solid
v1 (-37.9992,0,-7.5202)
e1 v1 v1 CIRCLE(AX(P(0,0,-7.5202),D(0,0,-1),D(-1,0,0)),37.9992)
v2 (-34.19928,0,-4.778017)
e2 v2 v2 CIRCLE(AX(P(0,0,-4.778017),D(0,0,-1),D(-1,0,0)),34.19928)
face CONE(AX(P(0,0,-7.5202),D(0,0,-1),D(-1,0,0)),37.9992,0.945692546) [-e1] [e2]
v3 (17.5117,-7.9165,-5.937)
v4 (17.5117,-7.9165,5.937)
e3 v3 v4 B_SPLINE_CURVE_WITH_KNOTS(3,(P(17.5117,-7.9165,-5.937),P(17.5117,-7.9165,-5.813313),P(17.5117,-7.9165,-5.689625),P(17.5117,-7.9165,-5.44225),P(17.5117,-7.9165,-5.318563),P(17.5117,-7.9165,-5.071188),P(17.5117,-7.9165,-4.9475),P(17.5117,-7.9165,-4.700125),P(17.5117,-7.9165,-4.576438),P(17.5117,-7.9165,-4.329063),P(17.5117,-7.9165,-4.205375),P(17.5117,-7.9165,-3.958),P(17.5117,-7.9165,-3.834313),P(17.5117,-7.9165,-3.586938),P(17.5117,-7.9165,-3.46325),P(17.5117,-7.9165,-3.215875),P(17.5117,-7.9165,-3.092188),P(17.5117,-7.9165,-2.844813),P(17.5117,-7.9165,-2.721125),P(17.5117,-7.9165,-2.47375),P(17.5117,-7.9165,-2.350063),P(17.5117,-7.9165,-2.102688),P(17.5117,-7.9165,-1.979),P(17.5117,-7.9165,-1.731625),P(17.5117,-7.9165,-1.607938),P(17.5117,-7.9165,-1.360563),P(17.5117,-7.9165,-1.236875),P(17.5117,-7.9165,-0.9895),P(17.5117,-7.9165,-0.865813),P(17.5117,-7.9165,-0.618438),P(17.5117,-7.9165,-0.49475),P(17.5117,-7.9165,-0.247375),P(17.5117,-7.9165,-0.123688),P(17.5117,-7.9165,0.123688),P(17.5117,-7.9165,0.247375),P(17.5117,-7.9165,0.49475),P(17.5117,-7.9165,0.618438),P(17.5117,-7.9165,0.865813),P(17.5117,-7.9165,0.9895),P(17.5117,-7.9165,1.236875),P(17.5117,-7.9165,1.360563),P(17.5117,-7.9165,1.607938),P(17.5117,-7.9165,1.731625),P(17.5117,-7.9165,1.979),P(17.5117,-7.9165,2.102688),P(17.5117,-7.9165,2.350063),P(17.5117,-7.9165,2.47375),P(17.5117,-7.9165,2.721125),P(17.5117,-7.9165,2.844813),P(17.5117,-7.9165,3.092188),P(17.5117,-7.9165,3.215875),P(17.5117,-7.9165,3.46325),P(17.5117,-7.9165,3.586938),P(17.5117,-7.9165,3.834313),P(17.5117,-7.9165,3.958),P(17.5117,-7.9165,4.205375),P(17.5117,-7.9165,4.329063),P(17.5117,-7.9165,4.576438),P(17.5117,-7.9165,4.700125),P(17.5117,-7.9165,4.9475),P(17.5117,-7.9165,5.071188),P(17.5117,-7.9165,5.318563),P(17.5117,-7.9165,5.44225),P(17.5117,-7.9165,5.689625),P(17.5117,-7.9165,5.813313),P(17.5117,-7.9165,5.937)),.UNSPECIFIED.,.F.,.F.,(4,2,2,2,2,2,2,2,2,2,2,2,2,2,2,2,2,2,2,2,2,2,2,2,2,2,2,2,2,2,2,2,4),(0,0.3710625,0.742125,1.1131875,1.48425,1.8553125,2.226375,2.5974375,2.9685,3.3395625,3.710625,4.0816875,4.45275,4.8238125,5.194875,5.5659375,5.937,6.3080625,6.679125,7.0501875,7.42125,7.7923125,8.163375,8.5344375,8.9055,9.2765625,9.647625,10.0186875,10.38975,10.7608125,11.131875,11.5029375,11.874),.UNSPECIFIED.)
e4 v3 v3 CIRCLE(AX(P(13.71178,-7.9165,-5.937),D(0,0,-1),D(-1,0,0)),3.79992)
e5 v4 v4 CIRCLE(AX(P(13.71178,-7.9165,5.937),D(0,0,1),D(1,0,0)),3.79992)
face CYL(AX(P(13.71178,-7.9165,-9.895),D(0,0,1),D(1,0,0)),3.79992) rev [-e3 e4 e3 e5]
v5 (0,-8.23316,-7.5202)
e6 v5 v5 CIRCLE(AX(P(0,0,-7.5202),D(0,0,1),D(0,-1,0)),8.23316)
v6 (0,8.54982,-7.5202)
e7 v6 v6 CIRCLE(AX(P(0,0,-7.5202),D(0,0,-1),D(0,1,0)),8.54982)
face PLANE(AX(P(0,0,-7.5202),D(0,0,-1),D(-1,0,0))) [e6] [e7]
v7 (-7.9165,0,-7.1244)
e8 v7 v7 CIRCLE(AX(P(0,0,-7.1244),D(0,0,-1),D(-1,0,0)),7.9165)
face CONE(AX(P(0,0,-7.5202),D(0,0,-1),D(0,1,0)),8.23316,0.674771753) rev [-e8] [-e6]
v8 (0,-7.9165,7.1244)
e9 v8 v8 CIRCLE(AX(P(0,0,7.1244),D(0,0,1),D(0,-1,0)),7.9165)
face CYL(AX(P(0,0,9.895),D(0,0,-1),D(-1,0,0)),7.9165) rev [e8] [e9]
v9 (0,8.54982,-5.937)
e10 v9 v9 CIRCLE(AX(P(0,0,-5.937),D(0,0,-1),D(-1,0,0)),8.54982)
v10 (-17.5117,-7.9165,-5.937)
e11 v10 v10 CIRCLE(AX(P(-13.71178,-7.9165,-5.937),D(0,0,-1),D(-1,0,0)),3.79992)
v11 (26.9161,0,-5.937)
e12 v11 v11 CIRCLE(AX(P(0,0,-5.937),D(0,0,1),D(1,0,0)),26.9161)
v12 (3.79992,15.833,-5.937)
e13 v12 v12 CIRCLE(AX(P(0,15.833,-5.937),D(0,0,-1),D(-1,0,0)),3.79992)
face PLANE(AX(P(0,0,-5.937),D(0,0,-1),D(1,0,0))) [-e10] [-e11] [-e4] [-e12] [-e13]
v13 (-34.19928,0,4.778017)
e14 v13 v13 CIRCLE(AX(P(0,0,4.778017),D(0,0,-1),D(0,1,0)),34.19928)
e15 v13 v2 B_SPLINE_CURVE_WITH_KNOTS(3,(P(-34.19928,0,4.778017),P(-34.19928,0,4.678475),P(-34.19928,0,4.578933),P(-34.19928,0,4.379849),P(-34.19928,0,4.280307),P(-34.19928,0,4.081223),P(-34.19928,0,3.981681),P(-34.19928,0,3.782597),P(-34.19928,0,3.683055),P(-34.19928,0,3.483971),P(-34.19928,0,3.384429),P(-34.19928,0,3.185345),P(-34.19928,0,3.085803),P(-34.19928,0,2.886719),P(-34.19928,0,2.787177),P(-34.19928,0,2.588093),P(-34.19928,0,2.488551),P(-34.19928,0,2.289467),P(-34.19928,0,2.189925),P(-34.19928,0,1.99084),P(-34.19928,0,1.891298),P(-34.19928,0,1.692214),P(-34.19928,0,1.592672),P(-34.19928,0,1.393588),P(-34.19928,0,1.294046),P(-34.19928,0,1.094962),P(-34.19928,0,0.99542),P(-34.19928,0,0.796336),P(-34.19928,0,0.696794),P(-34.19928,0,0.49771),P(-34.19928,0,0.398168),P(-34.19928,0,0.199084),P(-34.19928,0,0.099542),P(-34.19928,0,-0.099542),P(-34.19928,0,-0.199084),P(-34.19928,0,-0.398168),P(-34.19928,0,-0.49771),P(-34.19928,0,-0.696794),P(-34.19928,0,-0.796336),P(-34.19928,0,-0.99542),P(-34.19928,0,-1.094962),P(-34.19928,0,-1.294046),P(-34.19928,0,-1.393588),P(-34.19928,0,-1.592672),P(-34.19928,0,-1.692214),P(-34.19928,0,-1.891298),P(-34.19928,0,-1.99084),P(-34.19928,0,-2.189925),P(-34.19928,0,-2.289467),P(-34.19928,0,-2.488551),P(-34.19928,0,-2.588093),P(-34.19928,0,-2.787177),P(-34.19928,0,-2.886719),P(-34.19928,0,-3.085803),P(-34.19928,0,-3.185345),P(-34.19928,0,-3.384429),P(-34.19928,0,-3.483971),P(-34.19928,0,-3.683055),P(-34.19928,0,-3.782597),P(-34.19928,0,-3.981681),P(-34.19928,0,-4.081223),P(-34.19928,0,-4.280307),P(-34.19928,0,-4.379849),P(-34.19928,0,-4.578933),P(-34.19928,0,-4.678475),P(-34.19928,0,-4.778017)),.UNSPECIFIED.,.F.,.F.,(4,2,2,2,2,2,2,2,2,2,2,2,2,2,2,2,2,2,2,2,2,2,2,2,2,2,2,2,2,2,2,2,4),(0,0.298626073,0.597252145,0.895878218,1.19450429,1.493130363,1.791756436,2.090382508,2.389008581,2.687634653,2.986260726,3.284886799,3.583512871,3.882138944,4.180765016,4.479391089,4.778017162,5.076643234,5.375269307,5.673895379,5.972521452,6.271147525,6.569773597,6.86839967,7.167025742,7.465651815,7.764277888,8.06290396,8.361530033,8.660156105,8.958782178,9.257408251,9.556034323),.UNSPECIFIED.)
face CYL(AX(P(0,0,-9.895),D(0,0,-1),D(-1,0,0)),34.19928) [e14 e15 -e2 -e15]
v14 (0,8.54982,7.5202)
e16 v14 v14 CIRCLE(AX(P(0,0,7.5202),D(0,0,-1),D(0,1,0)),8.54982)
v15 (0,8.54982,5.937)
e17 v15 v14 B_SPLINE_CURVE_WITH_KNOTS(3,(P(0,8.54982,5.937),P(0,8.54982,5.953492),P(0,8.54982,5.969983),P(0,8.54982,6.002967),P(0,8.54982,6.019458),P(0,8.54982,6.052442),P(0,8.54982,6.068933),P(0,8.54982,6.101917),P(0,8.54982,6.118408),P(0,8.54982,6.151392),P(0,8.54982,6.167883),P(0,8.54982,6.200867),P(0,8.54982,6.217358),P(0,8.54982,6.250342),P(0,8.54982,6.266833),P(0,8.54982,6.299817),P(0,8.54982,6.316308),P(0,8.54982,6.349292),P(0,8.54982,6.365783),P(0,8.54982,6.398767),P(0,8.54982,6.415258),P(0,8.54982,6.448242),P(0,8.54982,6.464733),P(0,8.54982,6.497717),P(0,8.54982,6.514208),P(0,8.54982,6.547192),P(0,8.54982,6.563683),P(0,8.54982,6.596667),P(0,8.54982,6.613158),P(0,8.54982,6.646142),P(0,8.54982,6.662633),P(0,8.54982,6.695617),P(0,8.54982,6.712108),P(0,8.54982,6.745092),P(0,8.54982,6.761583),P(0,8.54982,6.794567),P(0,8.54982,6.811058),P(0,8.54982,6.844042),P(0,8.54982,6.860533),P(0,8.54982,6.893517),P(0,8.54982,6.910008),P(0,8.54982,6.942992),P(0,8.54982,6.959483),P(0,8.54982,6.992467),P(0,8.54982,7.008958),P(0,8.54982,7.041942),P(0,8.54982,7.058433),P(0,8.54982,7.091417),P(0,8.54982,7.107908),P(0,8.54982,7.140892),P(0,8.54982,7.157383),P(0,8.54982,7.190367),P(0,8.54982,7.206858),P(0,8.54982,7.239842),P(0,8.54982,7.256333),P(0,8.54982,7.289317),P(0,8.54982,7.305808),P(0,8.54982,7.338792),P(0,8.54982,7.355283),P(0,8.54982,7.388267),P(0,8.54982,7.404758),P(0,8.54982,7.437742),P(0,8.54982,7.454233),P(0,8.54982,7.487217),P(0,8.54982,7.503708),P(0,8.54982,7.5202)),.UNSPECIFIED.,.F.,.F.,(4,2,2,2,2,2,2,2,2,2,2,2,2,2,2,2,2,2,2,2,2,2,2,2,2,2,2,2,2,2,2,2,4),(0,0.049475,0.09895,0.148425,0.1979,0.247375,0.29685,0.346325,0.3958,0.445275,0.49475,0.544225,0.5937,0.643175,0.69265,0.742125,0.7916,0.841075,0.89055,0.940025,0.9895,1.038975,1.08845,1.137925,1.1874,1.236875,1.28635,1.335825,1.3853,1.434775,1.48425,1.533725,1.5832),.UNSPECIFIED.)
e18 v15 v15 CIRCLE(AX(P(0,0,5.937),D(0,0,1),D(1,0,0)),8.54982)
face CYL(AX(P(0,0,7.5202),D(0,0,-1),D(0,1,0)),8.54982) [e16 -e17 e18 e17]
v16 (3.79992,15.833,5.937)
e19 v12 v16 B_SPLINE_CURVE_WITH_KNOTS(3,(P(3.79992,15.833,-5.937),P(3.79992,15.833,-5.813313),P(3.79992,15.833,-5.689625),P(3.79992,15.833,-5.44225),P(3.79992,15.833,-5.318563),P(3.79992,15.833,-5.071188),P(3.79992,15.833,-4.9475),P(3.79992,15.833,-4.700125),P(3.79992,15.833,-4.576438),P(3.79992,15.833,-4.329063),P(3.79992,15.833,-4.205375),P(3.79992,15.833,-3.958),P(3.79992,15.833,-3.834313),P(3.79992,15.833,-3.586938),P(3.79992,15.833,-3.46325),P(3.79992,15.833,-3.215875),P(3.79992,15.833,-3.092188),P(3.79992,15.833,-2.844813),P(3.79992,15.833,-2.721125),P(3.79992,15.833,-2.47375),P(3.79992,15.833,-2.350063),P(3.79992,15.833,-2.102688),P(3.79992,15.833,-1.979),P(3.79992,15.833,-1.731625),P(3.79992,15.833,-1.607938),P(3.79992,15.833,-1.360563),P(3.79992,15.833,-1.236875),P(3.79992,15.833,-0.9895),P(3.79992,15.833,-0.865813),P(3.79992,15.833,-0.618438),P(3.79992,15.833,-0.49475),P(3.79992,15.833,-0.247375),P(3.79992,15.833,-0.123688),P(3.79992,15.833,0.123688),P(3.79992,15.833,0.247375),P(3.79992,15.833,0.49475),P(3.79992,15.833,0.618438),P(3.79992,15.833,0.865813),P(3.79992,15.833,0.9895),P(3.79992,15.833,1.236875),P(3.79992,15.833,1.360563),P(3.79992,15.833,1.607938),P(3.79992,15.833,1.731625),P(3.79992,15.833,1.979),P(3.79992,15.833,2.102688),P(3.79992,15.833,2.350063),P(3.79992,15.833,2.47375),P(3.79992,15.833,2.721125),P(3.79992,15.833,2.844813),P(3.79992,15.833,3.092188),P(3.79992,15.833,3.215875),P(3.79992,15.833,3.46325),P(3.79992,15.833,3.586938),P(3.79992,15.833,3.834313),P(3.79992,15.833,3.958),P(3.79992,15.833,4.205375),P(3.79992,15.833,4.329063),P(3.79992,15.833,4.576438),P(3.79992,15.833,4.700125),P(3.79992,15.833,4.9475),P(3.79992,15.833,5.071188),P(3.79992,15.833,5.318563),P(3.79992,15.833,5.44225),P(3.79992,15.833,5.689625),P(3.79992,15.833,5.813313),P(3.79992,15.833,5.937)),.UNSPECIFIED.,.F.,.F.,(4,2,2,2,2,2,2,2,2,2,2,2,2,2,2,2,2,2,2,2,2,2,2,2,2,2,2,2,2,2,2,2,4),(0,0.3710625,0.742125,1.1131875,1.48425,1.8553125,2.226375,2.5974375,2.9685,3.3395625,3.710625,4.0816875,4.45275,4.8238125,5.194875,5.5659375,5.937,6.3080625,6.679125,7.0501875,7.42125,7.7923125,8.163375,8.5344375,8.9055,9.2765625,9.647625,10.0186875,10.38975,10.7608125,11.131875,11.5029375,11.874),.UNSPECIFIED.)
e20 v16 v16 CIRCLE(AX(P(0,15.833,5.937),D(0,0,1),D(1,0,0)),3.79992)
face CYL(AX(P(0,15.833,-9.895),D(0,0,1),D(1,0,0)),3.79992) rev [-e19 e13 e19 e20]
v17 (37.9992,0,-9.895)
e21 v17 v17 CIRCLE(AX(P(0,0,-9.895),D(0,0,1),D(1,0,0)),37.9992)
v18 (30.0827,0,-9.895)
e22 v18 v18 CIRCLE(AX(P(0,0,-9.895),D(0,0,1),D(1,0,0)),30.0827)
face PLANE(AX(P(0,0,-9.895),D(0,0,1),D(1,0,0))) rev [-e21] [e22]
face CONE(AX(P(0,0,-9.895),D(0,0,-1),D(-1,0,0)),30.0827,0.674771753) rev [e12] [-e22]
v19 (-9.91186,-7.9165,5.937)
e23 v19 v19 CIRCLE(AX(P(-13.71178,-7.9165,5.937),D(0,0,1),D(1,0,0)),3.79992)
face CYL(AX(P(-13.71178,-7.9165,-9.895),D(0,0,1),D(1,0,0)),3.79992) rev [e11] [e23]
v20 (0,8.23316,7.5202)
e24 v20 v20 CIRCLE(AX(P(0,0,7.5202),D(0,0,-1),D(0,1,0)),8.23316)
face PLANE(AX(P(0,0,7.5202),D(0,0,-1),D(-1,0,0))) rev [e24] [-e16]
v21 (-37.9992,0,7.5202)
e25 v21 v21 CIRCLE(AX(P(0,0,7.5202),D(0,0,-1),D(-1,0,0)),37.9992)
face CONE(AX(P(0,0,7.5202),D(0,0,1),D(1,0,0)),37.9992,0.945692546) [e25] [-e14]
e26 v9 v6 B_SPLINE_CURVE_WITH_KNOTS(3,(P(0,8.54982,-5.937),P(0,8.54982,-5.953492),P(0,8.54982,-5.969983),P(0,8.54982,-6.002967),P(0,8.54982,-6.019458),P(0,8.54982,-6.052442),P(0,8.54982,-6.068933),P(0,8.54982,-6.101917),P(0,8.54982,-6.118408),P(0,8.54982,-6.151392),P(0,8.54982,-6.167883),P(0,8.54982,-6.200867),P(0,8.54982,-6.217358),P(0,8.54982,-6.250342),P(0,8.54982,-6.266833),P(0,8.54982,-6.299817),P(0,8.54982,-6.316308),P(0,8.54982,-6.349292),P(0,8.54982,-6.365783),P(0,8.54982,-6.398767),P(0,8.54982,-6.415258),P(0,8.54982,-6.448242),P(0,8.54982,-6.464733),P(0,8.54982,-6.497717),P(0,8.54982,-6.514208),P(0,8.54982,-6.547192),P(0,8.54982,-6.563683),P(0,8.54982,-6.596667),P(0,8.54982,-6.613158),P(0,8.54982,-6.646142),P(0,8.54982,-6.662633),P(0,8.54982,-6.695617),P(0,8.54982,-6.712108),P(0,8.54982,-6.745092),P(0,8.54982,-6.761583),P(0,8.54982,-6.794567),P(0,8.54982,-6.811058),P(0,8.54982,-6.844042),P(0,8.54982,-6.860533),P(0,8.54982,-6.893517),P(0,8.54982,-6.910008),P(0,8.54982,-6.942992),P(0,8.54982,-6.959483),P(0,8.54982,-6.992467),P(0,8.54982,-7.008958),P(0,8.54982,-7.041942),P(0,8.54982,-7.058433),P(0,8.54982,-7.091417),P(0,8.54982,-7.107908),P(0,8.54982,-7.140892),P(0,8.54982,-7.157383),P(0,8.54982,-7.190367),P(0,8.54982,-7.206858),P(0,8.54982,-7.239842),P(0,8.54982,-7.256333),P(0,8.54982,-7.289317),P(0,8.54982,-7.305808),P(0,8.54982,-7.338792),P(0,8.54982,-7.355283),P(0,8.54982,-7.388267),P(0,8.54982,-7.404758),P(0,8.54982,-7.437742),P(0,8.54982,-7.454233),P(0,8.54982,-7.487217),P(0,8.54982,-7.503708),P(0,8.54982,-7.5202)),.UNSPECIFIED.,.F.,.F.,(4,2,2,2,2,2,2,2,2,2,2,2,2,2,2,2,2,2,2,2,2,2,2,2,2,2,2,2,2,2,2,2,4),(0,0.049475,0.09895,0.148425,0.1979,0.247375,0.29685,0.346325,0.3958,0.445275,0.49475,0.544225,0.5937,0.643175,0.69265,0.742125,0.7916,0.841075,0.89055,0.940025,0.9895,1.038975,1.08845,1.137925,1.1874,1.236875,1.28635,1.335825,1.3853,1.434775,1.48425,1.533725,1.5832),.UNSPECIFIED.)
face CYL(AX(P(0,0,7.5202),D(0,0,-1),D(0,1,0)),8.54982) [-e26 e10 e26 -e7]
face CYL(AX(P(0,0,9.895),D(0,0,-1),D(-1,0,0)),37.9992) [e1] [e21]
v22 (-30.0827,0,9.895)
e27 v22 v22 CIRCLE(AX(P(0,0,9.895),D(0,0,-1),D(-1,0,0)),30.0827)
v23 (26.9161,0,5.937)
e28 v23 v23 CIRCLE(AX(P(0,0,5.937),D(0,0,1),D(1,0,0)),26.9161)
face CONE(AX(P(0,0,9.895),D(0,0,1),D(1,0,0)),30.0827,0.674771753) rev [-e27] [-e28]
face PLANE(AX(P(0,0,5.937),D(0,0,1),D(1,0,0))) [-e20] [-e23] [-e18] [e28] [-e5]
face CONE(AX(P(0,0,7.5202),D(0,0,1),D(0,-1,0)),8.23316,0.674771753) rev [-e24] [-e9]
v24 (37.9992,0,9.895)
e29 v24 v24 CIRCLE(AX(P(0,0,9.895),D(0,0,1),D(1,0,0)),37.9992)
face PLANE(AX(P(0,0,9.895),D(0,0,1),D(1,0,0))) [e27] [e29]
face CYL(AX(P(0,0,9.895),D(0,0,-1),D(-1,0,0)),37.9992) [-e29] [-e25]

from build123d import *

# Parameters (mm, degrees)
ESQUISSE1_R             = 60
ESQUISSE1_R_2           = 12.5
BOSS_EXTRU_1_DEPTH      = 12.5
ESQUISSE3_R             = 42.5
ENL_V_MAT_EXTRU_1_DEPTH = 5
ESQUISSE4_R             = 6
ENL_V_MAT_EXTRU_2_DEPTH = 88.177978871
BOSS_EXTRU_2_DEPTH      = 2
BOSS_EXTRU_2_DEPTH_BACK = 17
ESQUISSE6_R             = 13.5
ESQUISSE6_R_2           = 12.5
CHANFREIN1_SIZE         = 5
CHANFREIN2_SIZE         = 0.5
ESCALA1_SCALE           = 0.63332
ESCALA2_SCALE_X         = 1
ESCALA2_SCALE_Y         = 1
ESCALA2_SCALE_Z         = 1.249921051


with BuildPart() as part:
    # Esquisse1 → Boss.-Extru.1 (new, symmetric)
    with BuildSketch(Plane.XY):
        Circle(ESQUISSE1_R)
        Circle(ESQUISSE1_R_2, mode=Mode.SUBTRACT)
    extrude(amount=BOSS_EXTRU_1_DEPTH, both=True)

    # Esquisse3 → Enlèv. mat.-Extru.1 (cut, symmetric)
    with BuildSketch(Plane.XY.offset(12.5)):
        Circle(ESQUISSE3_R)
    enl_v_mat_extru_1 = extrude(amount=ENL_V_MAT_EXTRU_1_DEPTH, both=True, mode=Mode.SUBTRACT)

    # Symétrie1: Enlèv. mat.-Extru.1 across plane
    add(enl_v_mat_extru_1.mirror(Plane.XY), mode=Mode.SUBTRACT)

    # Esquisse4 → Enlèv. mat.-Extru.2 (cut, through all)
    with BuildSketch(Plane.XY.offset(7.5)):
        with Locations((0, 25)):
            Circle(ESQUISSE4_R)
        with Locations((21.650635095, -12.5)):
            Circle(ESQUISSE4_R)
        with Locations((-21.650635095, -12.5)):
            Circle(ESQUISSE4_R)
    extrude(amount=-ENL_V_MAT_EXTRU_2_DEPTH, mode=Mode.SUBTRACT)

    # Esquisse5 → Enlèvement de matière-Révolution1 (revolve, cut)
    with BuildSketch(Plane(origin=(0, 0, 0), x_dir=(1, 0, 0), z_dir=(0, 1, 0)), mode=Mode.PRIVATE) as enl_vement_de_mati_re_r_volution1_sk:
        Polygon((60, 9.5), (54, 6.035898385), (54, -6.035898385), (60, -9.5), align=None)
    revolve(enl_vement_de_mati_re_r_volution1_sk.sketch.rotate(Axis((0, 0, -12.5), (0, 0, 1)), 180), axis=Axis((0, 0, -12.5), (0, 0, 1)), mode=Mode.SUBTRACT)

    # Esquisse6 → Boss.-Extru.2 (add, two sides: drawn at the far end of the back side and taken through both)
    with BuildSketch(Plane(origin=(0, 0, -7.5), x_dir=(-1, 0, 0), z_dir=(0, 0, -1)).offset(-BOSS_EXTRU_2_DEPTH_BACK)):
        Circle(ESQUISSE6_R)
        Circle(ESQUISSE6_R_2, mode=Mode.SUBTRACT)
    extrude(amount=BOSS_EXTRU_2_DEPTH + BOSS_EXTRU_2_DEPTH_BACK)

    # Chanfrein1
    chanfrein1_edges = [part.edges().sort_by_distance(p)[0] for p in [
        (-42.5, 0, 12.5),
        (-42.5, 0, -12.5),
    ]]
    chamfer(chanfrein1_edges, length=CHANFREIN1_SIZE - 0.0001)  # a hair under: the kernel refuses the full size

    # Chanfrein2
    chanfrein2_edges = [part.edges().sort_by_distance(p)[0] for p in [
        (12.5, 0, 9.5),
        (12.5, 0, -9.5),
    ]]
    chamfer(chanfrein2_edges, length=CHANFREIN2_SIZE)


with BuildPart() as part_1:
    # Escala1: scaled about (0, 0, 0)
    add(part.part.scale(ESCALA1_SCALE))


with BuildPart() as part_2:
    # Escala2: scaled about (0, 0, 0)
    add(part_1.part.scale((ESCALA2_SCALE_X, ESCALA2_SCALE_Y, ESCALA2_SCALE_Z), about=(0, 0, 0)))


solid = part_2.part
